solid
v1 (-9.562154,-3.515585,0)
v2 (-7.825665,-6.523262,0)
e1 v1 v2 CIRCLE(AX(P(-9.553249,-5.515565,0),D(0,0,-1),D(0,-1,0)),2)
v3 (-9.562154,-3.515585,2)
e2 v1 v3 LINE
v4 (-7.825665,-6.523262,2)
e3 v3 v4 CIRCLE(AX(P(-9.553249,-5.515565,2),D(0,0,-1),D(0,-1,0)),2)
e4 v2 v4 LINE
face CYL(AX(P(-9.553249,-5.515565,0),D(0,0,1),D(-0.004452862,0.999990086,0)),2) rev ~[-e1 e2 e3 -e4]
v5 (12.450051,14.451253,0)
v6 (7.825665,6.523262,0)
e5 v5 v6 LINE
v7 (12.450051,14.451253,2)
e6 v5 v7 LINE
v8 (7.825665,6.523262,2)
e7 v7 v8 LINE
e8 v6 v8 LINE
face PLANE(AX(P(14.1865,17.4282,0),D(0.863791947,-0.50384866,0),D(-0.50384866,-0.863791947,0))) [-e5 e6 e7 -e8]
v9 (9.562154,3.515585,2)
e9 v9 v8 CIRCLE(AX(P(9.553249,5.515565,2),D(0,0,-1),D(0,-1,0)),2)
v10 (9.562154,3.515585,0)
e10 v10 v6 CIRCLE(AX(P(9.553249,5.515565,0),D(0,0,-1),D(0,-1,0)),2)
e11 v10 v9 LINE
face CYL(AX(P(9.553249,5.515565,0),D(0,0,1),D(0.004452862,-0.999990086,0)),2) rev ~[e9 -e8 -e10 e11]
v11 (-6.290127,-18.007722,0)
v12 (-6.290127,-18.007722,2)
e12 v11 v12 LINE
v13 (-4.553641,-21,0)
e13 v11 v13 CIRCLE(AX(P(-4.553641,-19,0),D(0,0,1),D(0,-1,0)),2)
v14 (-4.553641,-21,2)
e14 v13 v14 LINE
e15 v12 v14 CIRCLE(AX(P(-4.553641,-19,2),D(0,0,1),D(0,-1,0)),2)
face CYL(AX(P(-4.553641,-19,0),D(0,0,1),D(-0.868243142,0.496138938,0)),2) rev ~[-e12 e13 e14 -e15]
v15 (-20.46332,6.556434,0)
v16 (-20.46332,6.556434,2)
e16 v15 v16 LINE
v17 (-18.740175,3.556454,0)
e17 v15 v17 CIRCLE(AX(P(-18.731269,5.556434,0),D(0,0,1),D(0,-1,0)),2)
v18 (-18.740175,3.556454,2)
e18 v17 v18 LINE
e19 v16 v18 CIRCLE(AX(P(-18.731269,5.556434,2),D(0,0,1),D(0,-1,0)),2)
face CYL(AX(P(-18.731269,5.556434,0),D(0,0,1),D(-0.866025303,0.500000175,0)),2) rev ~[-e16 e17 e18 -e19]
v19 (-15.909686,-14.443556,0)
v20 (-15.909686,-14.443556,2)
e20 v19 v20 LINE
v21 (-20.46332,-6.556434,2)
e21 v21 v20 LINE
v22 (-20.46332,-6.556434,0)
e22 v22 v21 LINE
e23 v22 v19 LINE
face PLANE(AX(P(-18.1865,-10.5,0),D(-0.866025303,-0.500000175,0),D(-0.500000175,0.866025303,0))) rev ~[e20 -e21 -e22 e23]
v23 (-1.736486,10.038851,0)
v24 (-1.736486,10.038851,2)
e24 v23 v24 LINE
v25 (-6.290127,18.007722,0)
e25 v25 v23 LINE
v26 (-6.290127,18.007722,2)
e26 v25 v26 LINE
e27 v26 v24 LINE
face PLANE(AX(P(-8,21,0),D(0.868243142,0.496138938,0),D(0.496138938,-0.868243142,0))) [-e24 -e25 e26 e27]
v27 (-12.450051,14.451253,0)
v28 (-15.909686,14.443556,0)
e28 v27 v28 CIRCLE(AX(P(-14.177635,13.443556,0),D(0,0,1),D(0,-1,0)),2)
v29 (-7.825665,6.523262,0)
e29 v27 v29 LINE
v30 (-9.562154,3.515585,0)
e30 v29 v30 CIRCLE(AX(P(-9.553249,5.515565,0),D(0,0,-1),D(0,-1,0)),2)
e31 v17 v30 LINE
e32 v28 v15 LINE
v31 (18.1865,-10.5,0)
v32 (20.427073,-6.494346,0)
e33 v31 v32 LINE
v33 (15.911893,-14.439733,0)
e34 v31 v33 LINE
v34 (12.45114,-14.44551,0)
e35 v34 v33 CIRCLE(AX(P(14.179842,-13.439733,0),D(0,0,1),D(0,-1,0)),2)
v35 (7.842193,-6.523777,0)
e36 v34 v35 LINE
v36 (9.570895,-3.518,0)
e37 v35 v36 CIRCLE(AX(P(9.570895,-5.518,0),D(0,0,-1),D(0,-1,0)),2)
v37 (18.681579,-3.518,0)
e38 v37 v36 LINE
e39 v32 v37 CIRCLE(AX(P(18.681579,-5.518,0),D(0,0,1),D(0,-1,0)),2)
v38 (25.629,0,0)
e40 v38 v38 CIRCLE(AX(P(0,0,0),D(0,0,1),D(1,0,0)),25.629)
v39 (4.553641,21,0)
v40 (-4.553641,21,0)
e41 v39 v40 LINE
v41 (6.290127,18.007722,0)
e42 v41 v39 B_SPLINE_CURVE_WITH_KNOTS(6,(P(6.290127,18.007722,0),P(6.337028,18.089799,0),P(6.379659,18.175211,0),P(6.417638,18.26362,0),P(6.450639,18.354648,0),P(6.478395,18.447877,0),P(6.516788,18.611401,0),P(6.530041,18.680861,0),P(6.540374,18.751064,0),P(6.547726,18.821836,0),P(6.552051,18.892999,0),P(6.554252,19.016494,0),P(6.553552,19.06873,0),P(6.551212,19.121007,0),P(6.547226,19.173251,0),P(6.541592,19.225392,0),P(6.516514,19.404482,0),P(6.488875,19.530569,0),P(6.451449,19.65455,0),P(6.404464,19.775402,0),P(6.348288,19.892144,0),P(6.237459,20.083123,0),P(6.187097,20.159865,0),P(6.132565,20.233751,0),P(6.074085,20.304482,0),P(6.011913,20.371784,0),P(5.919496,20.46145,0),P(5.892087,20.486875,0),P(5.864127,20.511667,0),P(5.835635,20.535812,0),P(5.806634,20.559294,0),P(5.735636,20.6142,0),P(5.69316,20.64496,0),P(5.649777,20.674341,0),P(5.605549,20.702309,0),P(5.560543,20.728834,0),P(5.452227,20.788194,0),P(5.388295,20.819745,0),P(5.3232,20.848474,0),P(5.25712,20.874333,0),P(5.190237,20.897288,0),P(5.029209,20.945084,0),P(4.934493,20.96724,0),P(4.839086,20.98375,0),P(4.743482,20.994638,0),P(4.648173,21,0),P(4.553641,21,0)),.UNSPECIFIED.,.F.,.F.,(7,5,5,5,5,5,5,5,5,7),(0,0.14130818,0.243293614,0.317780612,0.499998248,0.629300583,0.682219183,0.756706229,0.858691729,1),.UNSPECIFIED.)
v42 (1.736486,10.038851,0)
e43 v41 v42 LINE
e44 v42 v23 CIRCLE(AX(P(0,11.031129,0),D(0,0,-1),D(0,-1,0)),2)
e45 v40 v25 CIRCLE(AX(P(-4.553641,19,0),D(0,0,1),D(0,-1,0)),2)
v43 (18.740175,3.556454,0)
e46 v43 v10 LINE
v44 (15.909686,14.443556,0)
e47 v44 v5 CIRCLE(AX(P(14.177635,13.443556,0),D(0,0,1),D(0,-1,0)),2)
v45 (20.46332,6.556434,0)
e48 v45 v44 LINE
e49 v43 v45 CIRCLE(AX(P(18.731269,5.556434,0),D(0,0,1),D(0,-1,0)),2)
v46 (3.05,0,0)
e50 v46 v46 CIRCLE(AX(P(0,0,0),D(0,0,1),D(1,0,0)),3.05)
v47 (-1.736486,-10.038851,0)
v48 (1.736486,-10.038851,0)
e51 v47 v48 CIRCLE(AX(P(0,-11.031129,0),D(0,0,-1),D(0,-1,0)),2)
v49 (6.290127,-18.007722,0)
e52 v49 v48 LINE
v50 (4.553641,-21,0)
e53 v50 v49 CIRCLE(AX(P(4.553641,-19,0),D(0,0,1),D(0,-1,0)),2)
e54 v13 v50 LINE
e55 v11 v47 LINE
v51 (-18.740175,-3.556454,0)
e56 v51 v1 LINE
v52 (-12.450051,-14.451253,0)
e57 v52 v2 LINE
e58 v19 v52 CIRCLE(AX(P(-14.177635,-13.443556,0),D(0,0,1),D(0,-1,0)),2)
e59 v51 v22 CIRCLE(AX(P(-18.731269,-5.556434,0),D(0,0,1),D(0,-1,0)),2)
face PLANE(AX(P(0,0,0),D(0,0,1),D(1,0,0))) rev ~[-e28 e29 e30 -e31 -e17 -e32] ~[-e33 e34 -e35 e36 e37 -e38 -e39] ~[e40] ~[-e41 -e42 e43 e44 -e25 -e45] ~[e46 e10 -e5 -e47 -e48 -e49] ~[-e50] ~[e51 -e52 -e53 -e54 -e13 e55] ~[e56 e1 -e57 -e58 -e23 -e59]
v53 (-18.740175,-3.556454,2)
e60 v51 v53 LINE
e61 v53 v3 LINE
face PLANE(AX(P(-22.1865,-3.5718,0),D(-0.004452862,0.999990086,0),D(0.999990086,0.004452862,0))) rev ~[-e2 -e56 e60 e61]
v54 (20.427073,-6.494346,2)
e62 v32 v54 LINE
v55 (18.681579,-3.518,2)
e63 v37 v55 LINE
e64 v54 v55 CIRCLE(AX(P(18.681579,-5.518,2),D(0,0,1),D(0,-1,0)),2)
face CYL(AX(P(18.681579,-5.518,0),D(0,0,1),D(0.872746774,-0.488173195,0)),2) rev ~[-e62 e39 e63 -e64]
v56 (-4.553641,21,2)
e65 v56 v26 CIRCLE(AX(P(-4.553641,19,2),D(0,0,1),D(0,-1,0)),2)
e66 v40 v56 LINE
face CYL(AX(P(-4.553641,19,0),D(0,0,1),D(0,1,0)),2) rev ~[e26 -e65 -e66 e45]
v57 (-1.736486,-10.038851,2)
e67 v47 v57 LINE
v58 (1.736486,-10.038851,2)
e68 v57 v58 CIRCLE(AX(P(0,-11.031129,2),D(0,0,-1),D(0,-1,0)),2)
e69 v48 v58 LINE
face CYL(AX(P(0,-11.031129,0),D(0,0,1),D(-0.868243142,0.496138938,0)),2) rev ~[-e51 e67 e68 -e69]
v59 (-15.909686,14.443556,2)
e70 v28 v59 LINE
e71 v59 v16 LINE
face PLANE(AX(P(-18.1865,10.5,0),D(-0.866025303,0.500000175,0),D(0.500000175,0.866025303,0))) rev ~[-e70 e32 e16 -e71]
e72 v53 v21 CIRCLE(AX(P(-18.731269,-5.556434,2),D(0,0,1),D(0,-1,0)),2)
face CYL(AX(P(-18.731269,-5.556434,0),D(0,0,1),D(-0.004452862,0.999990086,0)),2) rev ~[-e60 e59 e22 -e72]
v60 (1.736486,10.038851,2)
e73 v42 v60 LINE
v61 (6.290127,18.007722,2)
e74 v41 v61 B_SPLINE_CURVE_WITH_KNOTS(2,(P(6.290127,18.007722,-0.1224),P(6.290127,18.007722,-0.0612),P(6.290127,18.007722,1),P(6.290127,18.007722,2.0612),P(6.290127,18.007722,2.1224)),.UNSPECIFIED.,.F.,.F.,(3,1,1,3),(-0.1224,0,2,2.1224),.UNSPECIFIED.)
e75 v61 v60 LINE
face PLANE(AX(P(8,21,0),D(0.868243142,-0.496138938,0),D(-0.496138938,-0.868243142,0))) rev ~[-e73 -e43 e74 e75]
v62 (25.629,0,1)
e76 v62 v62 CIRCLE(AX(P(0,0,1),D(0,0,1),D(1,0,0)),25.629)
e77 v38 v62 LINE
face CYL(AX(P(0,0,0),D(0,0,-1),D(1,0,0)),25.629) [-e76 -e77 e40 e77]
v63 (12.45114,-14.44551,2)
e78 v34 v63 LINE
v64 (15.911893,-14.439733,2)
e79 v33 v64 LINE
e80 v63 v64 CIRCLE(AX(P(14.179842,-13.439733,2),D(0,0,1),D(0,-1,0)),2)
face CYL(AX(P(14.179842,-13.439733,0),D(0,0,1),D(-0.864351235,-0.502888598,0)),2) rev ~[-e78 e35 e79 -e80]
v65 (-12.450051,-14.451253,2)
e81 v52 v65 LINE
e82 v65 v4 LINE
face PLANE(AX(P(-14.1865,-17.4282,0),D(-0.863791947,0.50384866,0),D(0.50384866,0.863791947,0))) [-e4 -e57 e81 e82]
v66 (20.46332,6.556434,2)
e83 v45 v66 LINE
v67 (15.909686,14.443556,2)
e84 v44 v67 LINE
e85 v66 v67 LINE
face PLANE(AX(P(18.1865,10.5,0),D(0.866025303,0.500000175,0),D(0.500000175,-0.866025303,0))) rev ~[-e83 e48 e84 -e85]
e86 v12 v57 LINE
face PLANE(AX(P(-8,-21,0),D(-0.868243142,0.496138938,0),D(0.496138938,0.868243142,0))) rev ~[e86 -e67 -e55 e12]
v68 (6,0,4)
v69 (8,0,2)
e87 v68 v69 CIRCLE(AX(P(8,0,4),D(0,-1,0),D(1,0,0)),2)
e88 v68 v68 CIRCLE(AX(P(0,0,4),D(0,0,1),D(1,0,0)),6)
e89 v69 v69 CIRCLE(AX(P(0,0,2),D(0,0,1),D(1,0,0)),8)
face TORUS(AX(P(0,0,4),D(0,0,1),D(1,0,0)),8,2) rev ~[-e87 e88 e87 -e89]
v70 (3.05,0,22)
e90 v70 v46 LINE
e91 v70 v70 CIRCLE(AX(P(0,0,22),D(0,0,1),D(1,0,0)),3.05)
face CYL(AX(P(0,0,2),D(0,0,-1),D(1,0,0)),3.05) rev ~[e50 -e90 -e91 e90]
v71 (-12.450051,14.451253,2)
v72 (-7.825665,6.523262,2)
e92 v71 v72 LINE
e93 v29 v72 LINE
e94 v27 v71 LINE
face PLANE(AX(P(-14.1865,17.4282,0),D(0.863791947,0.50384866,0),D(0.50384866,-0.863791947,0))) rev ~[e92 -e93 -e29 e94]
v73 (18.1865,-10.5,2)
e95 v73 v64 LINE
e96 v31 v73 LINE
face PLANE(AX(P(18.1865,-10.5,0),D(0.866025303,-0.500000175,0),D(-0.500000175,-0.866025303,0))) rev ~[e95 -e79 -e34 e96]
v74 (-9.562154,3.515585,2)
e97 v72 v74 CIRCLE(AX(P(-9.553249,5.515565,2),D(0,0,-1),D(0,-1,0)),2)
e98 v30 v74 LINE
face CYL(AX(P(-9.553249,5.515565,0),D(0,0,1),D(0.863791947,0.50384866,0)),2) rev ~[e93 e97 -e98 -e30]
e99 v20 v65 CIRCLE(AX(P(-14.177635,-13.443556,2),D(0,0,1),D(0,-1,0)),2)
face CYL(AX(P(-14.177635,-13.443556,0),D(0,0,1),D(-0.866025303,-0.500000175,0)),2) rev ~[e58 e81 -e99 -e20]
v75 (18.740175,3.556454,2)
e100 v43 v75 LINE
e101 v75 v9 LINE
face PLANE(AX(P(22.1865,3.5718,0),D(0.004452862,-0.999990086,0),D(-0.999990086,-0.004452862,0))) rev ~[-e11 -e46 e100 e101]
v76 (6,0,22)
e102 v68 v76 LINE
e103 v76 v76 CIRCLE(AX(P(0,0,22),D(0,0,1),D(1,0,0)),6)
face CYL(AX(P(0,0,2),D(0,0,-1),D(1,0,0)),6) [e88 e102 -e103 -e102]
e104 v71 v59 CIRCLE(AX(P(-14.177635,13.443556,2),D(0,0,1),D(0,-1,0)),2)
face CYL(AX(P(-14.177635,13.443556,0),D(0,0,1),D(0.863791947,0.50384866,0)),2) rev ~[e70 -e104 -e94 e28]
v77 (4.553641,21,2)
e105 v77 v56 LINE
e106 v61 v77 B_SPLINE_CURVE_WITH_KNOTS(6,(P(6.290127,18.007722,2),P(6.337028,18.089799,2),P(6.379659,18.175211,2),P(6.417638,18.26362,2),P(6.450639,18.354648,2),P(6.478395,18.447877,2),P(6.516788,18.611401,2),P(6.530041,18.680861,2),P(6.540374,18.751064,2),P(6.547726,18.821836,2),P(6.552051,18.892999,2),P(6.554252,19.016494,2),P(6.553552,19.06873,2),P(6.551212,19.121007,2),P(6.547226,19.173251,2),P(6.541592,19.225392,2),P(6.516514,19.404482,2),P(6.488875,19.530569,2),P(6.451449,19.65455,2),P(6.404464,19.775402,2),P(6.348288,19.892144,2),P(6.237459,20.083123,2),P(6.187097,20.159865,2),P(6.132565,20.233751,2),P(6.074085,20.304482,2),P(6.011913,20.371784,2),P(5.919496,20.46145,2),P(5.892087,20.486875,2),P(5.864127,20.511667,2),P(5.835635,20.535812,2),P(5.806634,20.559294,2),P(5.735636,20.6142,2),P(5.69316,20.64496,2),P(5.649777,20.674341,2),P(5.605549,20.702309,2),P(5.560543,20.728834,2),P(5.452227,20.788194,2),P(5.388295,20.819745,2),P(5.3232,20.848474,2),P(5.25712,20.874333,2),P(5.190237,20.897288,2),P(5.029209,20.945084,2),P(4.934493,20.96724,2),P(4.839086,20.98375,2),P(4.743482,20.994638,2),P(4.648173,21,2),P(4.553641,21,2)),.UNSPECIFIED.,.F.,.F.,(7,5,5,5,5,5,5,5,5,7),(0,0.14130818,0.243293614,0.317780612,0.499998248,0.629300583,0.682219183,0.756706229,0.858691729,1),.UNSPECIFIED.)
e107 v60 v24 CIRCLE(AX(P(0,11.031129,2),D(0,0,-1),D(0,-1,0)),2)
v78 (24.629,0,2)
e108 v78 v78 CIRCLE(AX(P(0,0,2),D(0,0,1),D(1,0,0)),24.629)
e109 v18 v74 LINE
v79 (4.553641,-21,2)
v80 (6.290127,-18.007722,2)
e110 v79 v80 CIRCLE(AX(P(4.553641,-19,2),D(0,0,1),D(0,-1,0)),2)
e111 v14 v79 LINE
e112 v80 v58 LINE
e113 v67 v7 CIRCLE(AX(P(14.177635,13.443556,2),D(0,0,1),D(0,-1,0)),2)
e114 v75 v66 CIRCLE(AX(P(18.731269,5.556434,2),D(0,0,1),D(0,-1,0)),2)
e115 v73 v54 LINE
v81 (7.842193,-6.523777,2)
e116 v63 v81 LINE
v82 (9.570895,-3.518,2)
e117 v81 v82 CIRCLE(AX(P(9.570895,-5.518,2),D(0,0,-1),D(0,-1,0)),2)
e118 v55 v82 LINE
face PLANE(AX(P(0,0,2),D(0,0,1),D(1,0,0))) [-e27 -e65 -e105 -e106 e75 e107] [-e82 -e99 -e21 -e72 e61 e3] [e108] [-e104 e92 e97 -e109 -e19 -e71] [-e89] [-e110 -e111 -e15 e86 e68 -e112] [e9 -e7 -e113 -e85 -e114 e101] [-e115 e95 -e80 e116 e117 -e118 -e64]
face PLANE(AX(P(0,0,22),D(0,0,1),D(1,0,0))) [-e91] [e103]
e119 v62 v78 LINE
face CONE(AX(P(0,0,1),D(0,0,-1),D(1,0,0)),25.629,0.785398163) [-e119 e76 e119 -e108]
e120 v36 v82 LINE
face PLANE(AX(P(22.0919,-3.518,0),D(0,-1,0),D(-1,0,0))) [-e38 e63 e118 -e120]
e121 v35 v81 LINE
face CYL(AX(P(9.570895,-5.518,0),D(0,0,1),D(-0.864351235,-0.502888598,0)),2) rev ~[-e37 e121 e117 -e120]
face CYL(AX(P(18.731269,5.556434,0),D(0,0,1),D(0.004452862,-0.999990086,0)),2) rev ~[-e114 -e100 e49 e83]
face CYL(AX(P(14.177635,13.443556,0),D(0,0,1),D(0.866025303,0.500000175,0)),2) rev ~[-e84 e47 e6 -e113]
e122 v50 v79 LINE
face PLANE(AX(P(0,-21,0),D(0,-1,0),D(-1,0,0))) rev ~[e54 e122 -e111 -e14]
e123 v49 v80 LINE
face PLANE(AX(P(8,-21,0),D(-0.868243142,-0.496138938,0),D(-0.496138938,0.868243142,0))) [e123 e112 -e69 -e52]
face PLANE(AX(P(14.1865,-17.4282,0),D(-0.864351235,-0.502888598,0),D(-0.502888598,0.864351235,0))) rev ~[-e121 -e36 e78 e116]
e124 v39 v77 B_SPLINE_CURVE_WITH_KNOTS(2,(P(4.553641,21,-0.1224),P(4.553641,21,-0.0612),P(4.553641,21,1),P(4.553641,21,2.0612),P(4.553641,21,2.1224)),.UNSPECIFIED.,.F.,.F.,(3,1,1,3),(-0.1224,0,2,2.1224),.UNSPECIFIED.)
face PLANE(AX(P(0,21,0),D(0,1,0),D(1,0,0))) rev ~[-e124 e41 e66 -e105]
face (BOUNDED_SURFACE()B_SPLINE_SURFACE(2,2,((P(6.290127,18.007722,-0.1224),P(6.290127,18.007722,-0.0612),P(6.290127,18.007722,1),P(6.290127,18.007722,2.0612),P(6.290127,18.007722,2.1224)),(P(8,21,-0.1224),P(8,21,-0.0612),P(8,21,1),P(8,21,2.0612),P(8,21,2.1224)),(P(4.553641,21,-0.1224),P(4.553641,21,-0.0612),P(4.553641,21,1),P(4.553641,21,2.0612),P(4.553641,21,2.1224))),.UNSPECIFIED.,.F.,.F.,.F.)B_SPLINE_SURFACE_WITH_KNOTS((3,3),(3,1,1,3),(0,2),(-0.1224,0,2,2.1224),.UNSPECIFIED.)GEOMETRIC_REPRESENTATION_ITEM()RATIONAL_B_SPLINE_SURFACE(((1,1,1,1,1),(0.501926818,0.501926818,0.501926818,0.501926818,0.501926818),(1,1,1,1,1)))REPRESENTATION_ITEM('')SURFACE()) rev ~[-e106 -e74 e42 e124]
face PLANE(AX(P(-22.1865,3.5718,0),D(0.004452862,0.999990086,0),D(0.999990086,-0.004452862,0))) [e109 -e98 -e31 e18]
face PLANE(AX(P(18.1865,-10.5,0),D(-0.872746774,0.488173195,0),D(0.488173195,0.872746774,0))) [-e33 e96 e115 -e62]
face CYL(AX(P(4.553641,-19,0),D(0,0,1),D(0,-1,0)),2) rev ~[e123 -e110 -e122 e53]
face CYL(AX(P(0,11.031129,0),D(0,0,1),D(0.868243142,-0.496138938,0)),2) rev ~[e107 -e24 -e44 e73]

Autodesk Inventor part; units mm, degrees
sketch "Sketch1" plane through (0, 0, 0) normal (0, 0, 1) x (1, 0, 0)
  line L0 (0, 2.8582) -> (0, -2.8582) construction
  line L1 (-5.7775, 0) -> (5.7775, 0) construction
  circle A0 centre (0, 0) radius 25.629
  circle A1 centre (0, 0) radius 4
  line L2 (0, 4) -> (0, 7)
  line L3 (0, 7) -> (0, 21)
  line L4 (0, 21) -> (5, 21)
  line L5 (5, 21) -> (8, 21)
  line L6 (8, 21) -> (0, 7)
  line L7 (0, 21) -> (-8, 21)
  line L8 (-8, 21) -> (0, 7)
  line L9 (0, -4) -> (0, -7)
  line L10 (0, -7) -> (0, -21)
  line L11 (0, -21) -> (8, -21)
  line L12 (8, -21) -> (0, -7)
  line L13 (0, -21) -> (-8, -21)
  line L14 (-8, -21) -> (0, -7)
  line L15 (0, 0) -> (2.5981, 1.5)
  line L16 (0, 0) -> (3, 0) construction
  line L17 (2.5981, 1.5) -> (3.4641, 2)
  line L18 (3.4641, 2) -> (6.0622, 3.5)
  line L19 (6.0622, 3.5) -> (18.1865, 10.5)
  line L20 (18.1865, 10.5) -> (14.1865, 17.4282)
  line L21 (14.1865, 17.4282) -> (6.0622, 3.5)
  line L22 (18.1865, 10.5) -> (22.1865, 3.5718)
  line L23 (22.1865, 3.5718) -> (6.0622, 3.5)
  line L24 (0, 0) -> (8, 0) construction
  line L25 (0, 0) -> (3.4641, -2)
  line L26 (0, 0) -> (4, 0) construction
  line L27 (3.4641, -2) -> (6.0622, -3.5)
  line L28 (6.0622, -3.5) -> (18.1865, -10.5)
  line L29 (18.1865, -10.5) -> (14.1865, -17.4282)
  line L30 (14.1865, -17.4282) -> (6.0934, -3.518)
  line L31 (18.1865, -10.5) -> (22.0919, -3.518)
  line L32 (22.0919, -3.518) -> (6.0934, -3.518)
  line L33 (0, 0) -> (-2.5981, 1.5)
  line L34 (0, 0) -> (3, 0) construction
  line L35 (-2.5981, 1.5) -> (-3.4641, 2)
  line L36 (-3.4641, 2) -> (-6.0622, 3.5)
  line L37 (-6.0622, 3.5) -> (-18.1865, 10.5)
  line L38 (-18.1865, 10.5) -> (-14.1865, 17.4282)
  line L39 (-14.1865, 17.4282) -> (-6.0622, 3.5)
  line L40 (-18.1865, 10.5) -> (-22.1865, 3.5718)
  line L41 (-22.1865, 3.5718) -> (-6.0622, 3.5)
  line L42 (0, 0) -> (-6.0622, -3.5)
  line L43 (0, 0) -> (7, 0) construction
  line L44 (-6.0622, -3.5) -> (-18.1865, -10.5)
  line L45 (-18.1865, -10.5) -> (-14.1865, -17.4282)
  line L46 (-14.1865, -17.4282) -> (-6.0622, -3.5)
  line L47 (-18.1865, -10.5) -> (-22.1865, -3.5718)
  line L48 (-22.1865, -3.5718) -> (-6.0622, -3.5)
  dimension "d0" = 51.258
  dimension "d1" = 8
  dimension "d2" = 3
  dimension "d3" = 14
  dimension "d4" = 5
  dimension "d5" = 3
  dimension "d6" = 8
  dimension "d7" = 3
  dimension "d8" = 14
  dimension "d9" = 8
  dimension "d10" = 8
  dimension "d11" = 3
  dimension "d12" = 30
  dimension "d13" = 3
  dimension "d14" = 14
  dimension "d15" = 8
  dimension "d16" = 8
  dimension "d19" = 4
  dimension "d20" = 30
  dimension "d21" = 3
  dimension "d22" = 14
  dimension "d23" = 8
  dimension "d24" = 8
  dimension "d25" = 3
  dimension "d26" = 150
  dimension "d27" = 1
  dimension "d28" = 180
  dimension "d29" = 3
  dimension "d30" = 180
  dimension "d31" = 180
  dimension "d32" = 8
  dimension "d33" = 8
  dimension "d34" = 7
  dimension "d35" = 150
  dimension "d36" = 14
  dimension "d37" = 180
  dimension "d38" = 8
  dimension "d39" = 8
extrude "Extrusion1" add sketch "Sketch1" along normal blind 2
fillet "Fillet1" radius 2 18 edges at (14.1865, 17.4282, 1) (22.1865, 3.5718, 1) (6.0622, 3.5, 1) (22.0919, -3.518, 1) (14.1865, -17.4282, 1) (6.0934, -3.518, 1) (0, 7, 1) (-8, 21, 1) (8, 21, 1) (-6.0622, 3.5, 1) (-22.1865, 3.5718, 1) (-14.1865, 17.4282, 1) (-6.0622, -3.5, 1) (-14.1865, -17.4282, 1) (-22.1865, -3.5718, 1) (-8, -21, 1) (0, -7, 1) (8, -21, 1)
sketch "Sketch2" plane through (0, 0, 2) normal (0, 0, 1) x (1, 0, 0)
  circle A0 centre (0, 0) radius 3.05
  circle A1 centre (0, 0) radius 5
  dimension "d43" = 6.1
  dimension "d49" = 10
extrude "Extrusion2" add sketch "Sketch2" against normal blind 2
chamfer "Chamfer1" distance 1 angle 45 1 edges at (-25.629, 0, 2)
sketch "Sketch4" plane through (0, 0, 2) normal (0, 0, 1) x (1, 0, 0)
  circle A0 centre (0, 0) radius 3.05
  circle A1 centre (0, 0) radius 6
  dimension "d54" = 6.1
  dimension "d55" = 12
extrude "Extrusion4" add sketch "Sketch4" along normal blind 20
fillet "Fillet2" radius 2 1 edges at (-6, 0, 2)
properties part number "Wiel hout+spacer" material "S235"
